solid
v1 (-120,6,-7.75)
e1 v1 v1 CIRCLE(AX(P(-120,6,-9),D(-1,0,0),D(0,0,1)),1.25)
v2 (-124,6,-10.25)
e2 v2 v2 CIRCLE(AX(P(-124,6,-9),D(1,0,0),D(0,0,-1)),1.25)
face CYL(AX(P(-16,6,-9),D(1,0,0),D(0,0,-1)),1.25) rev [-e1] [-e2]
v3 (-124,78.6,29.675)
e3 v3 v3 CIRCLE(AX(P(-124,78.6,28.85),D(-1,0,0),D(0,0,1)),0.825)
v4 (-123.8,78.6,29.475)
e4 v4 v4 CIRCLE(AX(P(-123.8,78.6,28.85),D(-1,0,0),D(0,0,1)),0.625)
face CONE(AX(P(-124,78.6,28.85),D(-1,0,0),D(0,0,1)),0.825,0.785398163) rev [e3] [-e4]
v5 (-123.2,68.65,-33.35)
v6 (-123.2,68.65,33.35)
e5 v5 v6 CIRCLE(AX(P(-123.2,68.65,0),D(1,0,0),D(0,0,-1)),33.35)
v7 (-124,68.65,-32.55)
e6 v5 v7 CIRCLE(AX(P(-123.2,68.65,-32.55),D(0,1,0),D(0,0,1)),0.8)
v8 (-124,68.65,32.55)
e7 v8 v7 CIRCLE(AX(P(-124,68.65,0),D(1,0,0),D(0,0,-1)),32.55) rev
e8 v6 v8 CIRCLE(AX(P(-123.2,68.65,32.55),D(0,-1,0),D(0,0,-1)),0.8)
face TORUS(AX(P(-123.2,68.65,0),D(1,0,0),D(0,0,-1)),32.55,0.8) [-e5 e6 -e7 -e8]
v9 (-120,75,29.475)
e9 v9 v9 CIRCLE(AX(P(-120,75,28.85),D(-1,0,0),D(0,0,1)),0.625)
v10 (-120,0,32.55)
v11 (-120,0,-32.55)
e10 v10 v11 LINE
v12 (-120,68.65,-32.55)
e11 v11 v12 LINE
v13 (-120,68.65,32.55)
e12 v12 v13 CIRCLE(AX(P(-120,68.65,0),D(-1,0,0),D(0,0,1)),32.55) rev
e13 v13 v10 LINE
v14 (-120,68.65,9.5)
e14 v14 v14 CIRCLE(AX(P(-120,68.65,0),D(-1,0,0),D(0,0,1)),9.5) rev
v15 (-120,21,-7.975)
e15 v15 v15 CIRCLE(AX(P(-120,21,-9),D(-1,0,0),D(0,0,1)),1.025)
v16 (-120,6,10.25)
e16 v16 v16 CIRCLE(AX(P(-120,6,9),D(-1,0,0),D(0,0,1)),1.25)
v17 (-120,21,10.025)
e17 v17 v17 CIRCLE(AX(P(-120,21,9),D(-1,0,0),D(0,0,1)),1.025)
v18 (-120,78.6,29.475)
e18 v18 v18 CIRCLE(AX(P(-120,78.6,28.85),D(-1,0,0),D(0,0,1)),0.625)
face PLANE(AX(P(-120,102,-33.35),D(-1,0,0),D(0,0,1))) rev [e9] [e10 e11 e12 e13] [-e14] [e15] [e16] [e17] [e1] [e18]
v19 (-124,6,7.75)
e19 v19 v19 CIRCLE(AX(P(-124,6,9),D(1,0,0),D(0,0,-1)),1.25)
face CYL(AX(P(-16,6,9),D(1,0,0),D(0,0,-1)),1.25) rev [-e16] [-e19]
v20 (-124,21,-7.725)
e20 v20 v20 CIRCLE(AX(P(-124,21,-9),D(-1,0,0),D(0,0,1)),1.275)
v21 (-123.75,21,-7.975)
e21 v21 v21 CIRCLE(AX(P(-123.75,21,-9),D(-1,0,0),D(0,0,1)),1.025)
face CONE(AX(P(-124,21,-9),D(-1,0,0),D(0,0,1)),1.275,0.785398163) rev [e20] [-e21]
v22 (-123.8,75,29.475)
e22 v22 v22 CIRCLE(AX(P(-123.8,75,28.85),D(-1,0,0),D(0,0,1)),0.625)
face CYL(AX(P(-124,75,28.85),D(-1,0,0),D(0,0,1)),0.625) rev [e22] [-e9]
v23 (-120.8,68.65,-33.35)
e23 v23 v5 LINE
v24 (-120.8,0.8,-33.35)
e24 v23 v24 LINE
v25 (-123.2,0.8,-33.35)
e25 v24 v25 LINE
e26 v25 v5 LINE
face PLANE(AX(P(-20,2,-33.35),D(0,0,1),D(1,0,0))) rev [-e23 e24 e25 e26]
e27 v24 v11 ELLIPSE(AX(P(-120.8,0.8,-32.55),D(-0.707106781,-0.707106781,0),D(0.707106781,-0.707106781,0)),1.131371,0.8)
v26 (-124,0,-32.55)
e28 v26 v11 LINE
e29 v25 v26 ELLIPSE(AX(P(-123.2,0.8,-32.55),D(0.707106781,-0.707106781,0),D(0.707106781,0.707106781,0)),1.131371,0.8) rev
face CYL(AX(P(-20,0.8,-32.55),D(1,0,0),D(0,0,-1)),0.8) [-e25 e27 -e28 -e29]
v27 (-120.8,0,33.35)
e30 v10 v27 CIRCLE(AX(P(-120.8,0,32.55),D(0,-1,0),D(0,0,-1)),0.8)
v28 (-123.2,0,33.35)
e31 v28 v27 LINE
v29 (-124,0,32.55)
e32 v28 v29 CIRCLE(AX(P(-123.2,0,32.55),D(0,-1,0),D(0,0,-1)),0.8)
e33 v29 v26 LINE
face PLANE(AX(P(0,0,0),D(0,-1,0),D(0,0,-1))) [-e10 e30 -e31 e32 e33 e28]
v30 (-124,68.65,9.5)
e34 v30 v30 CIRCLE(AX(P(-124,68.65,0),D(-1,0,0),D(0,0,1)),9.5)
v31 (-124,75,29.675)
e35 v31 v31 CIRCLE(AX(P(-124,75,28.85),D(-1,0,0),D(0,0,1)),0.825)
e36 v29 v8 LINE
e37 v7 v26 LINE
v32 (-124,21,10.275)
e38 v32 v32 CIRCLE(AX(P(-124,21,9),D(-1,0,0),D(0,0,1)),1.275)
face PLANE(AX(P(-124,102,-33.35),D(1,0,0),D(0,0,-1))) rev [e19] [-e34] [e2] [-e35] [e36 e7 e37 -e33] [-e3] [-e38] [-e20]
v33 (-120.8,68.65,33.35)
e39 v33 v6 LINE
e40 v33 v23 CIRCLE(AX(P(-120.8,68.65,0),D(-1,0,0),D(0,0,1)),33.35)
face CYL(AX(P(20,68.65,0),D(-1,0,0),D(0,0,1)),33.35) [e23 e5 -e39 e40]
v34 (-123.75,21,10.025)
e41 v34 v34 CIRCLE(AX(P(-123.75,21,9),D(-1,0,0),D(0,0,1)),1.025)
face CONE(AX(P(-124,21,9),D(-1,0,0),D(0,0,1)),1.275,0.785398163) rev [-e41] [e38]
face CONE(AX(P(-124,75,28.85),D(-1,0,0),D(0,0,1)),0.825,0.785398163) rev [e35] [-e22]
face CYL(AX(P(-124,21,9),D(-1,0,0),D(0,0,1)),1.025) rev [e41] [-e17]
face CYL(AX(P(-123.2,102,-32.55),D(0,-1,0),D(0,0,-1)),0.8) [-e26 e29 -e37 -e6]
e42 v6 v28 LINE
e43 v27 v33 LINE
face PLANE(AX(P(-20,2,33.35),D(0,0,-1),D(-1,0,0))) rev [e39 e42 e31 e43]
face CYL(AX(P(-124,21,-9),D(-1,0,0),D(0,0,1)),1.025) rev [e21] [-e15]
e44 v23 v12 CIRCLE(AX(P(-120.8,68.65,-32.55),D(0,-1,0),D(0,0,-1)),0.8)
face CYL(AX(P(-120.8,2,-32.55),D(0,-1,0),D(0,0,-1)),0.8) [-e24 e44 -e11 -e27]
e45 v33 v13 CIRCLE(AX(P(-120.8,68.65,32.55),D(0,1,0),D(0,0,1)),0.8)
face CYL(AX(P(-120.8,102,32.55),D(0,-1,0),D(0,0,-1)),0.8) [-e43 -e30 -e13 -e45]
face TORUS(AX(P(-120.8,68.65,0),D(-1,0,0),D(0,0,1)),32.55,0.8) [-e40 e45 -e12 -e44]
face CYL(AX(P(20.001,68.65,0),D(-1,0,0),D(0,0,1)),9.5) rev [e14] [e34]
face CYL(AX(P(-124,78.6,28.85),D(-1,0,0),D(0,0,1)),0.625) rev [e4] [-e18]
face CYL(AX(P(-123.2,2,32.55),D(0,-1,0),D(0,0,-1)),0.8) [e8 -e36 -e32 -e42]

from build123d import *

# Parameters (mm, degrees)
SKETCH_1_W                   = 40
SKETCH_1_H                   = 66.7
EXTRUDE_1_DEPTH              = 2
SKETCH_2_W                   = 4
SKETCH_2_H                   = 66.7
EXTRUDE_2_DEPTH              = 100
CUT_EXTRUDE_1_DEPTH          = 115.526077816
CUT_EXTRUDE_1_DEPTH_BACK     = 115.526077816
HOLE_WIZARD_M4_1_D           = 3.3
HOLE_WIZARD_M4_1_CSINK_D     = 4.05
HOLE_WIZARD_M4_1_CSINK_ANGLE = 90
HOLE_WIZARD_M4_2_AT_2_COUNT  = 2
HOLE_WIZARD_M4_2_AT_2_PITCH  = 68.59294731
HOLE_WIZARD_M4_2_AT_3_COUNT  = 2
HOLE_WIZARD_M4_2_AT_3_PITCH  = 26
HOLE_WIZARD_M4_2_AT_4_COUNT  = 2
HOLE_WIZARD_M4_2_AT_4_PITCH  = 62.376998966
HOLE_WIZARD_M4_2_AT_5_COUNT  = 2
HOLE_WIZARD_M4_2_AT_5_PITCH  = 56.7
SKETCH_11_W                  = 66.7
SKETCH_11_H                  = 2
EXTRUDE_3_DEPTH              = 100
SKETCH_13_W                  = 40
SKETCH_13_H                  = 66.7
EXTRUDE_4_DEPTH              = 2
SKETCH_14_W                  = 4
SKETCH_14_H                  = 66.7
EXTRUDE_5_DEPTH              = 100
CUT_EXTRUDE_2_DEPTH          = 180.589037806
CUT_EXTRUDE_2_DEPTH_BACK     = 180.589037806
HOLE_WIZARD_M4_3_AT_2_COUNT  = 2
HOLE_WIZARD_M4_3_AT_2_PITCH  = 26
HOLE_WIZARD_M4_3_AT_3_COUNT  = 2
HOLE_WIZARD_M4_3_AT_3_PITCH  = 62.376998966
HOLE_WIZARD_M4_3_AT_4_COUNT  = 2
HOLE_WIZARD_M4_3_AT_4_PITCH  = 56.7
CUT_EXTRUDE_3_REACH          = 181.589
SKETCH_18_R                  = 9.5
CUT_EXTRUDE_4_REACH          = 181.589
SKETCH_21_R                  = 11
CUT_EXTRUDE_5_REACH          = 181.589
SKETCH_22_R                  = 4.5
FILLET_1_R                   = 2
CUT_EXTRUDE_6_REACH          = 193.604
SKETCH_23_W                  = 36
SKETCH_23_H                  = 66.7
CUT_EXTRUDE_7_REACH          = 164.752
SKETCH_24_W                  = 36
SKETCH_24_H                  = 66.7
HOLE_WIZARD_M3_1_D           = 2.5
HOLE_WIZARD_M3_1_CSINK_D     = 3.05
HOLE_WIZARD_M3_1_CSINK_ANGLE = 90
CUT_EXTRUDE_8_DEPTH          = 154.990981879
CUT_EXTRUDE_8_DEPTH_BACK     = 154.990981879
SKETCH_27_W                  = 104
SKETCH_27_H                  = 66.7
FILLET_2_R                   = 0.8


# Read off the part's stored shape, not the designer's step: M2.5 螺纹孔1, M1.6 螺纹孔1
with BuildPart() as part:
    # 草图1 → 凸台-拉伸1 (new body)
    with BuildSketch(Plane(origin=(0, 0, 0), x_dir=(1, 0, 0), z_dir=(0, 1, 0))):
        Rectangle(SKETCH_1_W, SKETCH_1_H)
    extrude(amount=EXTRUDE_1_DEPTH)

    # 草图2 → 凸台-拉伸2 (add)
    with BuildSketch(Plane(origin=(0, 2, 0), x_dir=(1, 0, 0), z_dir=(0, 1, 0))):
        with Locations((-18, 0)):
            Rectangle(SKETCH_2_W, SKETCH_2_H)
    extrude(amount=EXTRUDE_2_DEPTH)

    # 草图5 → 切除-拉伸1 (cut, two sides: drawn at the far end of the back side and taken through both)
    with BuildSketch(Plane.ZY.offset(20).offset(-CUT_EXTRUDE_1_DEPTH_BACK)):
        with BuildLine():
            ThreePointArc((0, 102), (23.582011153, 92.232011153), (33.35, 68.65))
            Line((33.35, 68.65), (33.35, 102))
            Line((33.35, 102), (0, 102))
        make_face()
        with BuildLine():
            ThreePointArc((-33.35, 68.65), (-23.582011153, 92.232011153), (0, 102))
            Line((0, 102), (-33.35, 102))
            Line((-33.35, 102), (-33.35, 68.65))
        make_face()
    extrude(amount=CUT_EXTRUDE_1_DEPTH + CUT_EXTRUDE_1_DEPTH_BACK, mode=Mode.SUBTRACT)

    # M4 螺纹孔1 (through all)
    with Locations(Plane.ZY.offset(20)):
        with Locations((0, 97.65), (25.11473671, 54.15), (-25.11473671, 54.15)):
            CounterSinkHole(HOLE_WIZARD_M4_1_D / 2, HOLE_WIZARD_M4_1_CSINK_D / 2, counter_sink_angle=HOLE_WIZARD_M4_1_CSINK_ANGLE)

    # 草图10 → M4 螺纹孔2 (revolve, cut)
    with BuildSketch(Plane(origin=(15, 2, -28.35), x_dir=(0, 0, 1), z_dir=(1, 0, 0))):
        Polygon((0, 0), (0, 2), (1.65, 2), (1.65, 0.375), (2.025, 0), align=None)
    hole_wizard_m4_2 = revolve(axis=Axis((15, 8.35, -28.35), (0, -1, 0)), mode=Mode.SUBTRACT)

    # M4 螺纹孔2 at 2: M4 螺纹孔2 ×2
    with Locations(*[Vector(-0.9508085645250022, 0, 0.3097790722852413) * (i * HOLE_WIZARD_M4_2_AT_2_PITCH) for i in range(1, HOLE_WIZARD_M4_2_AT_2_COUNT)]):
        add(hole_wizard_m4_2, mode=Mode.SUBTRACT)

    # M4 螺纹孔2 at 3: M4 螺纹孔2 ×2
    with Locations(*[(-i * HOLE_WIZARD_M4_2_AT_3_PITCH, 0, 0) for i in range(1, HOLE_WIZARD_M4_2_AT_3_COUNT)]):
        add(hole_wizard_m4_2, mode=Mode.SUBTRACT)

    # M4 螺纹孔2 at 4: M4 螺纹孔2 ×2
    with Locations(*[Vector(-0.4168203092647413, 0, 0.9089889052042635) * (i * HOLE_WIZARD_M4_2_AT_4_PITCH) for i in range(1, HOLE_WIZARD_M4_2_AT_4_COUNT)]):
        add(hole_wizard_m4_2, mode=Mode.SUBTRACT)

    # M4 螺纹孔2 at 5: M4 螺纹孔2 ×2
    with Locations(*[(0, 0, i * HOLE_WIZARD_M4_2_AT_5_PITCH) for i in range(1, HOLE_WIZARD_M4_2_AT_5_COUNT)]):
        add(hole_wizard_m4_2, mode=Mode.SUBTRACT)

    # 草图11 → 凸台-拉伸3 (add)
    with BuildSketch(Plane.ZY.offset(20)):
        with Locations((0, 16)):
            Rectangle(SKETCH_11_W, SKETCH_11_H)
    extrude(amount=EXTRUDE_3_DEPTH)



with BuildPart() as body_2:
    # 草图13 → 凸台-拉伸4 (new body)
    with BuildSketch(Plane(origin=(0, 0, 0), x_dir=(1, 0, 0), z_dir=(0, 1, 0))):
        with Locations((-140, 0)):
            Rectangle(SKETCH_13_W, SKETCH_13_H)
    extrude(amount=EXTRUDE_4_DEPTH)


with BuildPart() as part_1:
    add(part.part)

    add(body_2.part)  # 凸台-拉伸5 merges body 2
    # 草图14 → 凸台-拉伸5 (add)
    with BuildSketch(Plane(origin=(0, 2, 0), x_dir=(1, 0, 0), z_dir=(0, 1, 0))):
        with Locations((-122, 0)):
            Rectangle(SKETCH_14_W, SKETCH_14_H)
    extrude(amount=EXTRUDE_5_DEPTH)

    # 草图15 → 切除-拉伸2 (cut, two sides: drawn at the far end of the back side and taken through both)
    with BuildSketch(Plane.ZY.offset(124).offset(-CUT_EXTRUDE_2_DEPTH_BACK)):
        with BuildLine():
            ThreePointArc((0, 102), (23.582011153, 92.232011153), (33.35, 68.65))
            Line((33.35, 68.65), (33.35, 102))
            Line((33.35, 102), (0, 102))
        make_face()
        with BuildLine():
            ThreePointArc((-33.35, 68.65), (-23.582011153, 92.232011153), (0, 102))
            Line((0, 102), (-33.35, 102))
            Line((-33.35, 102), (-33.35, 68.65))
        make_face()
    extrude(amount=CUT_EXTRUDE_2_DEPTH + CUT_EXTRUDE_2_DEPTH_BACK, mode=Mode.SUBTRACT)

    # 草图17 → M4 螺纹孔3 (revolve, cut)
    with BuildSketch(Plane(origin=(-129, 2, -28.35), x_dir=(0, 0, 1), z_dir=(1, 0, 0))):
        Polygon((0, 0), (0, 2), (1.65, 2), (1.65, 0.375), (2.025, 0), align=None)
    hole_wizard_m4_3 = revolve(axis=Axis((-129, 8.35, -28.35), (0, -1, 0)), mode=Mode.SUBTRACT)

    # M4 螺纹孔3 at 2: M4 螺纹孔3 ×2
    with Locations(*[(-i * HOLE_WIZARD_M4_3_AT_2_PITCH, 0, 0) for i in range(1, HOLE_WIZARD_M4_3_AT_2_COUNT)]):
        add(hole_wizard_m4_3, mode=Mode.SUBTRACT)

    # M4 螺纹孔3 at 3: M4 螺纹孔3 ×2
    with Locations(*[Vector(-0.41682030926474106, 0, 0.9089889052042636) * (i * HOLE_WIZARD_M4_3_AT_3_PITCH) for i in range(1, HOLE_WIZARD_M4_3_AT_3_COUNT)]):
        add(hole_wizard_m4_3, mode=Mode.SUBTRACT)

    # M4 螺纹孔3 at 4: M4 螺纹孔3 ×2
    with Locations(*[(0, 0, i * HOLE_WIZARD_M4_3_AT_4_PITCH) for i in range(1, HOLE_WIZARD_M4_3_AT_4_COUNT)]):
        add(hole_wizard_m4_3, mode=Mode.SUBTRACT)

    # 草图18 → 切除-拉伸3 (cut, up to next)
    with BuildSketch(Plane.ZY.offset(124), mode=Mode.PRIVATE) as cut_extrude_3_sk1:
        with Locations((0, 68.65)):
            Circle(SKETCH_18_R)
    cut_extrude_3_tool1 = extrude(cut_extrude_3_sk1.sketch, amount=-CUT_EXTRUDE_3_REACH, mode=Mode.PRIVATE) & part_1.part
    add(cut_extrude_3_tool1.solids().sort_by_distance((-124, 68.65, 0))[0], mode=Mode.SUBTRACT)

    # 草图21 → 切除-拉伸4 (cut, up to next)
    with BuildSketch(Plane(origin=(-16, 0, 0), x_dir=(0, 0, -1), z_dir=(1, 0, 0)), mode=Mode.PRIVATE) as cut_extrude_4_sk1:
        with Locations((0, 68.65)):
            Circle(SKETCH_21_R)
    cut_extrude_4_tool1 = extrude(cut_extrude_4_sk1.sketch, amount=-CUT_EXTRUDE_4_REACH, mode=Mode.PRIVATE) & part_1.part
    add(cut_extrude_4_tool1.solids().sort_by_distance((-16, 68.65, 0))[0], mode=Mode.SUBTRACT)

    # 草图22 → 切除-拉伸5 (cut, up to next)
    with BuildSketch(Plane(origin=(-16, 0, 0), x_dir=(0, 0, -1), z_dir=(1, 0, 0)), mode=Mode.PRIVATE) as cut_extrude_5_sk1:
        with Locations((16.670989023, 59.025)):
            Circle(SKETCH_22_R)
    cut_extrude_5_tool1 = extrude(cut_extrude_5_sk1.sketch, amount=-CUT_EXTRUDE_5_REACH, mode=Mode.PRIVATE) & part_1.part
    add(cut_extrude_5_tool1.solids().sort_by_distance((-16, 59.025, -16.670989))[0], mode=Mode.SUBTRACT)

    # 圆角1
    fillet_1_edges = [part_1.edges().sort_by_distance(p)[0] for p in [
        (-160, 1, -33.35),
        (-160, 1, 33.35),
        (20, 1, 33.35),
        (20, 1, -33.35),
    ]]
    fillet(fillet_1_edges, radius=FILLET_1_R)

    # 草图23 → 切除-拉伸6 (cut, up to next)
    with BuildSketch(Plane(origin=(0, 2, 0), x_dir=(1, 0, 0), z_dir=(0, 1, 0)), mode=Mode.PRIVATE) as cut_extrude_6_sk1:
        with Locations((-142, 0)):
            Rectangle(SKETCH_23_W, SKETCH_23_H)
    cut_extrude_6_tool1 = extrude(cut_extrude_6_sk1.sketch, amount=-CUT_EXTRUDE_6_REACH, mode=Mode.PRIVATE) & part_1.part
    add(cut_extrude_6_tool1.solids().sort_by_distance((-142, 2, 0))[0], mode=Mode.SUBTRACT)

    # 草图24 → 切除-拉伸7 (cut, up to next)
    with BuildSketch(Plane(origin=(0, 2, 0), x_dir=(1, 0, 0), z_dir=(0, 1, 0)), mode=Mode.PRIVATE) as cut_extrude_7_sk1:
        with Locations((2, 0)):
            Rectangle(SKETCH_24_W, SKETCH_24_H)
    cut_extrude_7_tool1 = extrude(cut_extrude_7_sk1.sketch, amount=-CUT_EXTRUDE_7_REACH, mode=Mode.PRIVATE) & part_1.part
    add(cut_extrude_7_tool1.solids().sort_by_distance((2, 2, 0))[0], mode=Mode.SUBTRACT)

    # M3 螺纹孔1 (through all)
    with Locations(Plane(origin=(-16, 0, 0), x_dir=(0, 0, -1), z_dir=(1, 0, 0))):
        with Locations((9, 6), (-9, 6)):
            CounterSinkHole(HOLE_WIZARD_M3_1_D / 2, HOLE_WIZARD_M3_1_CSINK_D / 2, counter_sink_angle=HOLE_WIZARD_M3_1_CSINK_ANGLE)

    # 草图27 → 切除-拉伸8 (cut, two sides: drawn at the far end of the back side and taken through both)
    with BuildSketch(Plane(origin=(0, 17, 0), x_dir=(1, 0, 0), z_dir=(0, 1, 0)).offset(-CUT_EXTRUDE_8_DEPTH_BACK)):
        with Locations((-68, 0)):
            Rectangle(SKETCH_27_W, SKETCH_27_H)
    extrude(amount=CUT_EXTRUDE_8_DEPTH + CUT_EXTRUDE_8_DEPTH_BACK, mode=Mode.SUBTRACT)

    # M2.5 螺纹孔1 outline → M2.5 螺纹孔1 (revolve, cut)
    with BuildSketch(Plane(origin=(0, 21, -9), x_dir=(0, 1, 0), z_dir=(0, 0, -1))):
        Polygon((1.025, -123.75), (1.025, -120), (0, -120), (0, -124), (1.275, -124), align=None)
    revolve(axis=Axis((0, 21, -9), (1, 0, 0)), mode=Mode.SUBTRACT)

    # Hole Wizard M2.5 _1 2 outline → Hole Wizard M2.5 _1 2 (revolve, cut)
    with BuildSketch(Plane(origin=(0, 21, 9), x_dir=(0, 1, 0), z_dir=(0, 0, -1))):
        Polygon((1.025, -123.75), (1.025, -120), (0, -120), (0, -124), (1.275, -124), align=None)
    revolve(axis=Axis((0, 21, 9), (1, 0, 0)), mode=Mode.SUBTRACT)

    # 圆角2
    fillet_2_edges = [part_1.edges().sort_by_distance(p)[0] for p in [
        (-120, 34.325, 33.35),
        (-120, 34.325, -33.35),
        (-122, 0, -33.35),
        (-124, 34.325, -33.35),
        (-120, 102, 0),
        (-124, 102, 0),
        (-124, 34.325, 33.35),
    ]]
    fillet(fillet_2_edges, radius=FILLET_2_R)

    # M1.6 螺纹孔1 outline → M1.6 螺纹孔1 (revolve, cut)
    with BuildSketch(Plane(origin=(0, 75, 28.85), x_dir=(0, 1, 0), z_dir=(0, 0, -1))):
        Polygon((0.625, -123.8), (0.625, -120), (0, -120), (0, -124), (0.825, -124), align=None)
    revolve(axis=Axis((0, 75, 28.85), (1, 0, 0)), mode=Mode.SUBTRACT)

    # Hole Wizard M1.6 _1 2 outline → Hole Wizard M1.6 _1 2 (revolve, cut)
    with BuildSketch(Plane(origin=(0, 78.6, 28.85), x_dir=(0, 1, 0), z_dir=(0, 0, -1))):
        Polygon((0.625, -123.8), (0.625, -120), (0, -120), (0, -124), (0.825, -124), align=None)
    revolve(axis=Axis((0, 78.6, 28.85), (1, 0, 0)), mode=Mode.SUBTRACT)


solid = part_1.part
